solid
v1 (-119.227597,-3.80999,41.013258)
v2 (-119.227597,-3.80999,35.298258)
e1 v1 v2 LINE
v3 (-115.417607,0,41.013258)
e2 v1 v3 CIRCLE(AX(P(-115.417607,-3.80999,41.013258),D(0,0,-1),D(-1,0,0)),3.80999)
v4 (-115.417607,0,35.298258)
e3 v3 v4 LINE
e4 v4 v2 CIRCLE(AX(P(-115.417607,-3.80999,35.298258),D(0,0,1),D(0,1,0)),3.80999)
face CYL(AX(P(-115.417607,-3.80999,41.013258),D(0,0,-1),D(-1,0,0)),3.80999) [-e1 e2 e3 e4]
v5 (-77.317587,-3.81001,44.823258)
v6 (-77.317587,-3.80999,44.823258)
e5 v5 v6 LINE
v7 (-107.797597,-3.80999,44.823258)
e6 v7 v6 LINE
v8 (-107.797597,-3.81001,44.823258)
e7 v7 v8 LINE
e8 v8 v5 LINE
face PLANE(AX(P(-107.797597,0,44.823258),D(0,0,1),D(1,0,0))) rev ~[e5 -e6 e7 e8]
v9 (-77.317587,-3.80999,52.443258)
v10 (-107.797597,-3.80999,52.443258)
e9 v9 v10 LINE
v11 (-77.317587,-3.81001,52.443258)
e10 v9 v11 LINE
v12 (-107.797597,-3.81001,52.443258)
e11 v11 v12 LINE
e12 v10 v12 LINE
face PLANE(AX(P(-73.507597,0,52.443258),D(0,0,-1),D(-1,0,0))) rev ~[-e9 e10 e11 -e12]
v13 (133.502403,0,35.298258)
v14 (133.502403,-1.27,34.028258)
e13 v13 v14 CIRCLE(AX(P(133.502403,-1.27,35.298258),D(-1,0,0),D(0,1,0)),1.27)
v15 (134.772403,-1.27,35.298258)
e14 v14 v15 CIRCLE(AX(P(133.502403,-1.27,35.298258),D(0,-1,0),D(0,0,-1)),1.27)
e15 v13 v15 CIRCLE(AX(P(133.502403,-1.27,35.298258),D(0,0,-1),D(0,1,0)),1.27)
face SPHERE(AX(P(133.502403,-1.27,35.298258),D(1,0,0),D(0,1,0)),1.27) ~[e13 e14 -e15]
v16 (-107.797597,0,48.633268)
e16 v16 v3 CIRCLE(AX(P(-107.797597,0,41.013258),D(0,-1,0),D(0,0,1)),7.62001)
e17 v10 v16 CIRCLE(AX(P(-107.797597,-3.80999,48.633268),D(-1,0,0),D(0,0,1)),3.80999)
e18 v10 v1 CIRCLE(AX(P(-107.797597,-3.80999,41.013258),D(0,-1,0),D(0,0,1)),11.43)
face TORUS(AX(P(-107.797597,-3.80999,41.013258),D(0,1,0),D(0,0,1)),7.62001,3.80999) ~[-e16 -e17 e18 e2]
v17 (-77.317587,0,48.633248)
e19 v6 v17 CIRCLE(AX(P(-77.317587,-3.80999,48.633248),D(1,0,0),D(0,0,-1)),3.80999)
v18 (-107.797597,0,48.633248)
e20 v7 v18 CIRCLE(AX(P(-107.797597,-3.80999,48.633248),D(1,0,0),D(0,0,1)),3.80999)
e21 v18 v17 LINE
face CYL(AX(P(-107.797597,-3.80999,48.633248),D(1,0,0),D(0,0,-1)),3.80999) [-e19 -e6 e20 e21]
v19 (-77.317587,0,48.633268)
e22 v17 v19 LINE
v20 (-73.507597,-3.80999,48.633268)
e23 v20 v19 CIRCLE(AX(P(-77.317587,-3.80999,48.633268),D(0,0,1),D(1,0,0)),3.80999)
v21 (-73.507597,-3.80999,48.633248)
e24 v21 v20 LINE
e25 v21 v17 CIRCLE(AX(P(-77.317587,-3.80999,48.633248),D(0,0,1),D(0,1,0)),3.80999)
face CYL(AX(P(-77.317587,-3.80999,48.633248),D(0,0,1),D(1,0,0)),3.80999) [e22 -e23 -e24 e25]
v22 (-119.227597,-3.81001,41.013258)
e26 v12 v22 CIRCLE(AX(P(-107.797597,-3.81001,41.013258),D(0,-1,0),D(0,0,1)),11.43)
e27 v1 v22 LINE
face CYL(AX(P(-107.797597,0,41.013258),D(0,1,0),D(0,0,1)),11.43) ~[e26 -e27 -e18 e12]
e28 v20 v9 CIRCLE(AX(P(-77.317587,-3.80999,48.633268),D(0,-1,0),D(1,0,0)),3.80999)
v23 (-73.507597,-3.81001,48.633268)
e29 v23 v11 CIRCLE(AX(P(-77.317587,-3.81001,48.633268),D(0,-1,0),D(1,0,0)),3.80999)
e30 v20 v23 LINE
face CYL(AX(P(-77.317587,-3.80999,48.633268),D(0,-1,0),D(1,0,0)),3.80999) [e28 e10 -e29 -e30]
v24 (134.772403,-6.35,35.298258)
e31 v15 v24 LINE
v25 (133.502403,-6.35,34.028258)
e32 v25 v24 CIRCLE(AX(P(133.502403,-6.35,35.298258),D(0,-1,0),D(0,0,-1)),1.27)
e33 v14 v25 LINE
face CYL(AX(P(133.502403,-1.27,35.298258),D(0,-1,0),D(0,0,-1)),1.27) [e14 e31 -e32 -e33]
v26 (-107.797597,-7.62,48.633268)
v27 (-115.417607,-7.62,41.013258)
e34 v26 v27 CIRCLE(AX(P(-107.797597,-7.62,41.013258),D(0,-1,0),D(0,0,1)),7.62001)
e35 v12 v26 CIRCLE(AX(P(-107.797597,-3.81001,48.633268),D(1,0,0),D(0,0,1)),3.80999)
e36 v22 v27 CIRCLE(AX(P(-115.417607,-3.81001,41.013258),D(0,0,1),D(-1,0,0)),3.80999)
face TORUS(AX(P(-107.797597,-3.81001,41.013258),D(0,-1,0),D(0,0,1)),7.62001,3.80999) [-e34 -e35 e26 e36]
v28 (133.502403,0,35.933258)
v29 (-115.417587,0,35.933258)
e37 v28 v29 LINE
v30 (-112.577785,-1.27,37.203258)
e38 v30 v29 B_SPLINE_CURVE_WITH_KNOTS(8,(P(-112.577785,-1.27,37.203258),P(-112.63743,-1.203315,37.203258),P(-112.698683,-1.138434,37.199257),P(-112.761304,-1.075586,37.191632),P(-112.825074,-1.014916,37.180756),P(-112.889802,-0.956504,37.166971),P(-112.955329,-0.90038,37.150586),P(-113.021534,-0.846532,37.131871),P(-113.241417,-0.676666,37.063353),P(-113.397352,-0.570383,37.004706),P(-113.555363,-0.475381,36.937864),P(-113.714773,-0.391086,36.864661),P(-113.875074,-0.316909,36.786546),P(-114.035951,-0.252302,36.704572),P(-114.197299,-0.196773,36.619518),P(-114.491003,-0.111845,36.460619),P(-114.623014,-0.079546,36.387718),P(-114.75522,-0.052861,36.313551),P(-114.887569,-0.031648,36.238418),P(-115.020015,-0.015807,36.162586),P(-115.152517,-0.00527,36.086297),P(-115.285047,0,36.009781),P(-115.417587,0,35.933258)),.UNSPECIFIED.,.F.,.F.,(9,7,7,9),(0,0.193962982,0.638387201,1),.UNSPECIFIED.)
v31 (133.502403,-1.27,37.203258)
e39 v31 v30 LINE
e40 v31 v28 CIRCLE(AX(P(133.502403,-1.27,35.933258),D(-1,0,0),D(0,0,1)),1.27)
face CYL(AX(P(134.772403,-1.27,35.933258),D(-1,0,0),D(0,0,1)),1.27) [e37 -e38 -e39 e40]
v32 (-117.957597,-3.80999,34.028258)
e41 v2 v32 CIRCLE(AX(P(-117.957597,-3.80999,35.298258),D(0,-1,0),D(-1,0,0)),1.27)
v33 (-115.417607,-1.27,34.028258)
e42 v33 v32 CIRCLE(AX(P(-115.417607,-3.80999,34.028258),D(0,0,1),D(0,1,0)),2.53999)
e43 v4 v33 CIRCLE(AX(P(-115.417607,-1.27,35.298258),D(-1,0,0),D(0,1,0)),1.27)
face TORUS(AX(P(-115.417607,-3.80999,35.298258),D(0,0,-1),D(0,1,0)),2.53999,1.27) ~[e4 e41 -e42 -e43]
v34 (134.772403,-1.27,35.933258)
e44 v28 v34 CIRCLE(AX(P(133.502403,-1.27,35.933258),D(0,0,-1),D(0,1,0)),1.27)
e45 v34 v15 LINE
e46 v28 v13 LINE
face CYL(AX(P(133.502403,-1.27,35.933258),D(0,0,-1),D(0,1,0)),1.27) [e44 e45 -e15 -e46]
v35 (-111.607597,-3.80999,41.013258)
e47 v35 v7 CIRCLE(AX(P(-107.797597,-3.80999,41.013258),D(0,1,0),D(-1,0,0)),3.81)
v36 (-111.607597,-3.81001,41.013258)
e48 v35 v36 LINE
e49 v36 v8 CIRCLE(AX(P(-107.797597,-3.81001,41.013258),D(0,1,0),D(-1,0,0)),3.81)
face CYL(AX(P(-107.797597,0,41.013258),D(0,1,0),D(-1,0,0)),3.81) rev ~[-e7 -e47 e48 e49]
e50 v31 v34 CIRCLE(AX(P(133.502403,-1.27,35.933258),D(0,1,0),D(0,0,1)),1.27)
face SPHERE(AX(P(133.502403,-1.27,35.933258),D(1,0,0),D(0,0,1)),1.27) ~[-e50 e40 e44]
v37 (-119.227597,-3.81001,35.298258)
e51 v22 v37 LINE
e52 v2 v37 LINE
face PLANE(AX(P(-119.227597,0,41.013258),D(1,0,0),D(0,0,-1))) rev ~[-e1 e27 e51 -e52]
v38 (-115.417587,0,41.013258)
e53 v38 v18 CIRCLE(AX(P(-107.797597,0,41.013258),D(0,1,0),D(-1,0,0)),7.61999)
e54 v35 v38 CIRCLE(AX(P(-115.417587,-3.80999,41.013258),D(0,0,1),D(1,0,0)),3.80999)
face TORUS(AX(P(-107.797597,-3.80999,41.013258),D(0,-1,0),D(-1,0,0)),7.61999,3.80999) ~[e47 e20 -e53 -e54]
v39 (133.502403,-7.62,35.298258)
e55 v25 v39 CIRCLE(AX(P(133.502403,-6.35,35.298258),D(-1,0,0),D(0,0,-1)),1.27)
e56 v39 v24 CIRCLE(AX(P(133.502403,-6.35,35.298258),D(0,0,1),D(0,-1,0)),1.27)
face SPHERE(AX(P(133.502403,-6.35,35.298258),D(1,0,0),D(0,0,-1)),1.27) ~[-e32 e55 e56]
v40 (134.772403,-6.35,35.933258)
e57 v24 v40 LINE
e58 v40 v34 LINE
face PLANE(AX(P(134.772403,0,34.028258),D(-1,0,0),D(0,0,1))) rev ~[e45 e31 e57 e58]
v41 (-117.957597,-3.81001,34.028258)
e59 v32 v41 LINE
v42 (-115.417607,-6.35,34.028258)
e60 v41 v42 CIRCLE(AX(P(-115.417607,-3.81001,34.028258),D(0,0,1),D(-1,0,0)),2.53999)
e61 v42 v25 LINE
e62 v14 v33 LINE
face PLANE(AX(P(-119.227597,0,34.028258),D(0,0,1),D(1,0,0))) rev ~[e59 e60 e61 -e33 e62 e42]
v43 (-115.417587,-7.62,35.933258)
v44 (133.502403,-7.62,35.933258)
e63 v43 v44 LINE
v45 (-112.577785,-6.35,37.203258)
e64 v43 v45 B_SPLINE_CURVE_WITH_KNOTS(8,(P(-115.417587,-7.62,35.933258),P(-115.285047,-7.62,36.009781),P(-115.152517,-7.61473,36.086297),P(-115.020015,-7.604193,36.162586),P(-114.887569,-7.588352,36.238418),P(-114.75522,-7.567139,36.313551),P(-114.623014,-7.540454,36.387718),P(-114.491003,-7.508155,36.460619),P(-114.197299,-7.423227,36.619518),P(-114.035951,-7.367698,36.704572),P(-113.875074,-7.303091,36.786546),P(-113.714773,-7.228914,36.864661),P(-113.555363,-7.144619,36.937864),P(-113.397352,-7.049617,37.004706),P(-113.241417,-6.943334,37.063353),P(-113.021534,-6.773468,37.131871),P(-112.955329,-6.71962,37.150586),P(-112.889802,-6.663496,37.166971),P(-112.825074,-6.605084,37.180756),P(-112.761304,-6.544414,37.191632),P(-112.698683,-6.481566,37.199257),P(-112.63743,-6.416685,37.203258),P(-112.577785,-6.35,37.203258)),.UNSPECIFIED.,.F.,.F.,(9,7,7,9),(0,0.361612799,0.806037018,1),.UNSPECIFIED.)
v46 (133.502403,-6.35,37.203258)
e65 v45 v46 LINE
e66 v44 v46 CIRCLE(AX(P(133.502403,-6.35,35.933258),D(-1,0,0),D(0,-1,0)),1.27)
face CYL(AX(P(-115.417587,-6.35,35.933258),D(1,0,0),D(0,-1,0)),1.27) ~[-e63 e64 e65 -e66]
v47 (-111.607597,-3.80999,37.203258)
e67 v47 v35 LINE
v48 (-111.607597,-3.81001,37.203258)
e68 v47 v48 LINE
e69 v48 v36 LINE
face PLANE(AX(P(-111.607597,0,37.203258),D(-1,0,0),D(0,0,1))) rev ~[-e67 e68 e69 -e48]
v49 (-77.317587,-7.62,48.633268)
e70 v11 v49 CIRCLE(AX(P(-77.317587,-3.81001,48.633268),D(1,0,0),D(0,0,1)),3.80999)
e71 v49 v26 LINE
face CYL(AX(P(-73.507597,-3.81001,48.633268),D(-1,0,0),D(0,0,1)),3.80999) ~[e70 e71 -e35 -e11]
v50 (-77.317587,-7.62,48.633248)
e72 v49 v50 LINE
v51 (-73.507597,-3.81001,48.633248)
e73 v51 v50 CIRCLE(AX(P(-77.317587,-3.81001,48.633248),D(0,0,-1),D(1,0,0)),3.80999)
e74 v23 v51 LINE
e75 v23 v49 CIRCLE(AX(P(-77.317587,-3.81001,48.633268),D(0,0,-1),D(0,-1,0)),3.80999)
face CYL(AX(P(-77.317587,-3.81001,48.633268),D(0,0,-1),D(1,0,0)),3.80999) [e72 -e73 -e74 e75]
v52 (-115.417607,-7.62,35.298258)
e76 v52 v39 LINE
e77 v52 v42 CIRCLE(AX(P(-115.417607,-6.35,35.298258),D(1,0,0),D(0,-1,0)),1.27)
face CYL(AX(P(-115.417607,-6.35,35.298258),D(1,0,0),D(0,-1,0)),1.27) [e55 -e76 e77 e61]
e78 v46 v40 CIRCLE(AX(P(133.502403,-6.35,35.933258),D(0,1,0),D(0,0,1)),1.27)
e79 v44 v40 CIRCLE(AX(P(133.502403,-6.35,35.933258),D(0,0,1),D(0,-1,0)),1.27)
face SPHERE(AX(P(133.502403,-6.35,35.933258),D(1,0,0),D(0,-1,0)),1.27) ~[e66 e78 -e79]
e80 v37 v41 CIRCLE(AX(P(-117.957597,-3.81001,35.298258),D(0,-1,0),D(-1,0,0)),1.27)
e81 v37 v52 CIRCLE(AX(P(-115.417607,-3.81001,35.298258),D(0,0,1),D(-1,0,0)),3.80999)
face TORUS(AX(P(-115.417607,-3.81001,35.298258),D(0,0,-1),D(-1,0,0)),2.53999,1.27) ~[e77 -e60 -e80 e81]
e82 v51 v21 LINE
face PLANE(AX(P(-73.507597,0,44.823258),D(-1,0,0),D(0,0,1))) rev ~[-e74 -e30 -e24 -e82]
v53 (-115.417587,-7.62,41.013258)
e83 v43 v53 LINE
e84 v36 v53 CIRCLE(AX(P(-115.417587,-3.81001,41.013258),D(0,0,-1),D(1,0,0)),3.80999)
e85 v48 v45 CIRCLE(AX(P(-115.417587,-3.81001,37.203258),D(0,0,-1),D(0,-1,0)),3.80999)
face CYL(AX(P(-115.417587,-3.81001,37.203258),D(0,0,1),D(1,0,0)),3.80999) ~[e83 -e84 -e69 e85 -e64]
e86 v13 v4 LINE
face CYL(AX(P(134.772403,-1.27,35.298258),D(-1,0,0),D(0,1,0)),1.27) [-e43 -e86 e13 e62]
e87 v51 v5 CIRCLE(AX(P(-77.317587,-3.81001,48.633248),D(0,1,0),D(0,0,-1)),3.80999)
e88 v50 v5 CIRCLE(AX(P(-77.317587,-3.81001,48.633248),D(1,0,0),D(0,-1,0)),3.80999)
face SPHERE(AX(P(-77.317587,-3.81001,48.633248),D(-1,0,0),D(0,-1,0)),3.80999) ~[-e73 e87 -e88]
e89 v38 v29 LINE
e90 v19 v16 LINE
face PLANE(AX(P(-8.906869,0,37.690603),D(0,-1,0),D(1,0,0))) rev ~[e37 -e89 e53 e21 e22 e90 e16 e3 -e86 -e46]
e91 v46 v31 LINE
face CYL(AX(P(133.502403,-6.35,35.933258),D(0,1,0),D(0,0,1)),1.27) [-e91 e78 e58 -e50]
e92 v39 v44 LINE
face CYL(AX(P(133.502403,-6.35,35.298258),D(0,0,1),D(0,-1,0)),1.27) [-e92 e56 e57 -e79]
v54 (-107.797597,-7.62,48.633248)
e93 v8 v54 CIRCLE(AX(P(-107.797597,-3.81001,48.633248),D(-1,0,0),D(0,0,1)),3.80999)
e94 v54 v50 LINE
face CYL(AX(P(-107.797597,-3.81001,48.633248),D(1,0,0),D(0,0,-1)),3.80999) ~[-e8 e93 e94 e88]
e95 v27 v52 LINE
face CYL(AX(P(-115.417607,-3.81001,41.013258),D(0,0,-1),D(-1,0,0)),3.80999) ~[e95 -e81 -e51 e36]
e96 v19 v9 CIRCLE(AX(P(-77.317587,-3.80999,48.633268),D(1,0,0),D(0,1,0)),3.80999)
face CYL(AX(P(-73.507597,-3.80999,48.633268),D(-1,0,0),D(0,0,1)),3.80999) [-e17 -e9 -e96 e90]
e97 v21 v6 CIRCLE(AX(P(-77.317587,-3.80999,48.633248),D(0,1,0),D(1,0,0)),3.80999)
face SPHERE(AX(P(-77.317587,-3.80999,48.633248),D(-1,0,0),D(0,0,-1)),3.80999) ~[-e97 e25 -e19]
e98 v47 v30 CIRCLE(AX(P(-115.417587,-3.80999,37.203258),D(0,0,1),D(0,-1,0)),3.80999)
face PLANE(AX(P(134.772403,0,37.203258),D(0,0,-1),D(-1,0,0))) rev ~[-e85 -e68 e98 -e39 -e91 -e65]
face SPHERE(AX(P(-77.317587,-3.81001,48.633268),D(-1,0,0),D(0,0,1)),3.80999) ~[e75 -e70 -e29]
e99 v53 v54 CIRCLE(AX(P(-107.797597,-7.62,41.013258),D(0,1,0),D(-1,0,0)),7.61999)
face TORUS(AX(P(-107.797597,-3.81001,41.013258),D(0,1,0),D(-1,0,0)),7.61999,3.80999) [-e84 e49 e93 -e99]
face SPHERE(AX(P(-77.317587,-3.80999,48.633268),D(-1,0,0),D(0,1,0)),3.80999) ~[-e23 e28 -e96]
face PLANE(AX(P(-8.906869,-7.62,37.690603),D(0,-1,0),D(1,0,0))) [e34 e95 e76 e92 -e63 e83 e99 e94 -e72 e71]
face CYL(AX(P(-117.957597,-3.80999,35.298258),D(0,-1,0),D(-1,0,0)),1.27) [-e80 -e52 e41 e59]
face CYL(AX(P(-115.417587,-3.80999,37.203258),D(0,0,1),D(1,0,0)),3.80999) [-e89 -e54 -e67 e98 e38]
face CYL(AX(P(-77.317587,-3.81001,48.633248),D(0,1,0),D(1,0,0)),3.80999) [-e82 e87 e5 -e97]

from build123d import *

# Parameters (mm, degrees)
F1_DEPTH = 7.62
F2_R     = 3.80999
F3_R     = 3.80999
F4_R     = 1.27
F5_R     = 1.27


# Not quite as in the source:
# - a fillet or chamfer is up to 0.001 mm smaller than in the source, because OpenCascade refuses the exact size


with BuildPart() as f1:
    # F0 (on Front) → F1 (new body)
    with BuildSketch(Plane.XZ):
        with BuildLine():
            Line((134.7724028379, 37.2032584392), (-111.6075971621, 37.2032584392))
            Line((-111.6075971621, 37.2032584392), (-111.6075971621, 41.0132584392))
            ThreePointArc((-111.6075971621, 41.0132584392), (-110.4916739984, 43.7073352756), (-107.7975971621, 44.8232584392))
            Line((-107.7975971621, 44.8232584392), (-73.5075971621, 44.8232584392))
            Line((-73.5075971621, 44.8232584392), (-73.5075971621, 52.4432584392))
            Line((-73.5075971621, 52.4432584392), (-107.7975971621, 52.4432584392))
            ThreePointArc((-107.7975971621, 52.4432584392), (-115.8798276711, 49.0954889482), (-119.2275971621, 41.0132584392))
            Line((-119.2275971621, 41.0132584392), (-119.2275971621, 39.1082584392))
            Line((-119.2275971621, 39.1082584392), (-119.2275971621, 37.2032584392))
            Line((-119.2275971621, 37.2032584392), (-119.2275971621, 34.0282584392))
            Line((-119.2275971621, 34.0282584392), (134.7724028379, 34.0282584392))
            Line((134.7724028379, 34.0282584392), (134.7724028379, 37.2032584392))
        make_face()
    extrude(amount=F1_DEPTH)

    # F2 (radius 3.81 in the source; OpenCascade refuses exactly that, so slightly less here)
    f2_edges = [f1.edges().sort_by_distance(p)[0] for p in [
        (-90.652597, -7.62, 52.443258),
        (-90.652597, -7.62, 44.823258),
        (-90.652597, 0, 44.823258),
        (-90.652597, 0, 52.443258),
    ]]
    fillet(f2_edges, radius=F2_R)

    # F3 (radius 3.81 in the source; OpenCascade refuses exactly that, so slightly less here)
    f3_edges = [f1.edges().sort_by_distance(p)[0] for p in [
        (-73.507597, -3.81, 52.443258),
        (-73.507597, -1.11592, 51.327338),
        (-73.507597, 0, 48.633258),
        (-73.507597, -1.11592, 45.939179),
        (-73.507597, -3.81, 44.823258),
        (-73.507597, -6.50408, 45.939179),
        (-73.507597, -6.50408, 51.327338),
        (-73.507597, -7.62, 48.633258),
    ]]
    fillet(f3_edges, radius=F3_R)

    # F4
    f4_edges = [f1.edges().sort_by_distance(p)[0] for p in [
        (11.582403, -7.62, 37.203258),
        (9.677398, -7.62, 34.028258),
        (11.582403, 0, 37.203258),
        (9.677398, 0, 34.028258),
    ]]
    fillet(f4_edges, radius=F4_R)

    # F5
    f5_edges = [f1.edges().sort_by_distance(p)[0] for p in [
        (134.772403, -7.248026, 36.831284),
        (134.772403, -7.62, 35.615758),
        (134.772403, -7.248026, 34.400233),
        (134.772403, -3.81, 34.028258),
        (134.772403, -0.371974, 34.400233),
        (134.772403, 0, 35.615758),
        (134.772403, -3.81, 37.203258),
        (134.772403, -0.371974, 36.831284),
    ]]
    fillet(f5_edges, radius=F5_R)


solid = f1.part
